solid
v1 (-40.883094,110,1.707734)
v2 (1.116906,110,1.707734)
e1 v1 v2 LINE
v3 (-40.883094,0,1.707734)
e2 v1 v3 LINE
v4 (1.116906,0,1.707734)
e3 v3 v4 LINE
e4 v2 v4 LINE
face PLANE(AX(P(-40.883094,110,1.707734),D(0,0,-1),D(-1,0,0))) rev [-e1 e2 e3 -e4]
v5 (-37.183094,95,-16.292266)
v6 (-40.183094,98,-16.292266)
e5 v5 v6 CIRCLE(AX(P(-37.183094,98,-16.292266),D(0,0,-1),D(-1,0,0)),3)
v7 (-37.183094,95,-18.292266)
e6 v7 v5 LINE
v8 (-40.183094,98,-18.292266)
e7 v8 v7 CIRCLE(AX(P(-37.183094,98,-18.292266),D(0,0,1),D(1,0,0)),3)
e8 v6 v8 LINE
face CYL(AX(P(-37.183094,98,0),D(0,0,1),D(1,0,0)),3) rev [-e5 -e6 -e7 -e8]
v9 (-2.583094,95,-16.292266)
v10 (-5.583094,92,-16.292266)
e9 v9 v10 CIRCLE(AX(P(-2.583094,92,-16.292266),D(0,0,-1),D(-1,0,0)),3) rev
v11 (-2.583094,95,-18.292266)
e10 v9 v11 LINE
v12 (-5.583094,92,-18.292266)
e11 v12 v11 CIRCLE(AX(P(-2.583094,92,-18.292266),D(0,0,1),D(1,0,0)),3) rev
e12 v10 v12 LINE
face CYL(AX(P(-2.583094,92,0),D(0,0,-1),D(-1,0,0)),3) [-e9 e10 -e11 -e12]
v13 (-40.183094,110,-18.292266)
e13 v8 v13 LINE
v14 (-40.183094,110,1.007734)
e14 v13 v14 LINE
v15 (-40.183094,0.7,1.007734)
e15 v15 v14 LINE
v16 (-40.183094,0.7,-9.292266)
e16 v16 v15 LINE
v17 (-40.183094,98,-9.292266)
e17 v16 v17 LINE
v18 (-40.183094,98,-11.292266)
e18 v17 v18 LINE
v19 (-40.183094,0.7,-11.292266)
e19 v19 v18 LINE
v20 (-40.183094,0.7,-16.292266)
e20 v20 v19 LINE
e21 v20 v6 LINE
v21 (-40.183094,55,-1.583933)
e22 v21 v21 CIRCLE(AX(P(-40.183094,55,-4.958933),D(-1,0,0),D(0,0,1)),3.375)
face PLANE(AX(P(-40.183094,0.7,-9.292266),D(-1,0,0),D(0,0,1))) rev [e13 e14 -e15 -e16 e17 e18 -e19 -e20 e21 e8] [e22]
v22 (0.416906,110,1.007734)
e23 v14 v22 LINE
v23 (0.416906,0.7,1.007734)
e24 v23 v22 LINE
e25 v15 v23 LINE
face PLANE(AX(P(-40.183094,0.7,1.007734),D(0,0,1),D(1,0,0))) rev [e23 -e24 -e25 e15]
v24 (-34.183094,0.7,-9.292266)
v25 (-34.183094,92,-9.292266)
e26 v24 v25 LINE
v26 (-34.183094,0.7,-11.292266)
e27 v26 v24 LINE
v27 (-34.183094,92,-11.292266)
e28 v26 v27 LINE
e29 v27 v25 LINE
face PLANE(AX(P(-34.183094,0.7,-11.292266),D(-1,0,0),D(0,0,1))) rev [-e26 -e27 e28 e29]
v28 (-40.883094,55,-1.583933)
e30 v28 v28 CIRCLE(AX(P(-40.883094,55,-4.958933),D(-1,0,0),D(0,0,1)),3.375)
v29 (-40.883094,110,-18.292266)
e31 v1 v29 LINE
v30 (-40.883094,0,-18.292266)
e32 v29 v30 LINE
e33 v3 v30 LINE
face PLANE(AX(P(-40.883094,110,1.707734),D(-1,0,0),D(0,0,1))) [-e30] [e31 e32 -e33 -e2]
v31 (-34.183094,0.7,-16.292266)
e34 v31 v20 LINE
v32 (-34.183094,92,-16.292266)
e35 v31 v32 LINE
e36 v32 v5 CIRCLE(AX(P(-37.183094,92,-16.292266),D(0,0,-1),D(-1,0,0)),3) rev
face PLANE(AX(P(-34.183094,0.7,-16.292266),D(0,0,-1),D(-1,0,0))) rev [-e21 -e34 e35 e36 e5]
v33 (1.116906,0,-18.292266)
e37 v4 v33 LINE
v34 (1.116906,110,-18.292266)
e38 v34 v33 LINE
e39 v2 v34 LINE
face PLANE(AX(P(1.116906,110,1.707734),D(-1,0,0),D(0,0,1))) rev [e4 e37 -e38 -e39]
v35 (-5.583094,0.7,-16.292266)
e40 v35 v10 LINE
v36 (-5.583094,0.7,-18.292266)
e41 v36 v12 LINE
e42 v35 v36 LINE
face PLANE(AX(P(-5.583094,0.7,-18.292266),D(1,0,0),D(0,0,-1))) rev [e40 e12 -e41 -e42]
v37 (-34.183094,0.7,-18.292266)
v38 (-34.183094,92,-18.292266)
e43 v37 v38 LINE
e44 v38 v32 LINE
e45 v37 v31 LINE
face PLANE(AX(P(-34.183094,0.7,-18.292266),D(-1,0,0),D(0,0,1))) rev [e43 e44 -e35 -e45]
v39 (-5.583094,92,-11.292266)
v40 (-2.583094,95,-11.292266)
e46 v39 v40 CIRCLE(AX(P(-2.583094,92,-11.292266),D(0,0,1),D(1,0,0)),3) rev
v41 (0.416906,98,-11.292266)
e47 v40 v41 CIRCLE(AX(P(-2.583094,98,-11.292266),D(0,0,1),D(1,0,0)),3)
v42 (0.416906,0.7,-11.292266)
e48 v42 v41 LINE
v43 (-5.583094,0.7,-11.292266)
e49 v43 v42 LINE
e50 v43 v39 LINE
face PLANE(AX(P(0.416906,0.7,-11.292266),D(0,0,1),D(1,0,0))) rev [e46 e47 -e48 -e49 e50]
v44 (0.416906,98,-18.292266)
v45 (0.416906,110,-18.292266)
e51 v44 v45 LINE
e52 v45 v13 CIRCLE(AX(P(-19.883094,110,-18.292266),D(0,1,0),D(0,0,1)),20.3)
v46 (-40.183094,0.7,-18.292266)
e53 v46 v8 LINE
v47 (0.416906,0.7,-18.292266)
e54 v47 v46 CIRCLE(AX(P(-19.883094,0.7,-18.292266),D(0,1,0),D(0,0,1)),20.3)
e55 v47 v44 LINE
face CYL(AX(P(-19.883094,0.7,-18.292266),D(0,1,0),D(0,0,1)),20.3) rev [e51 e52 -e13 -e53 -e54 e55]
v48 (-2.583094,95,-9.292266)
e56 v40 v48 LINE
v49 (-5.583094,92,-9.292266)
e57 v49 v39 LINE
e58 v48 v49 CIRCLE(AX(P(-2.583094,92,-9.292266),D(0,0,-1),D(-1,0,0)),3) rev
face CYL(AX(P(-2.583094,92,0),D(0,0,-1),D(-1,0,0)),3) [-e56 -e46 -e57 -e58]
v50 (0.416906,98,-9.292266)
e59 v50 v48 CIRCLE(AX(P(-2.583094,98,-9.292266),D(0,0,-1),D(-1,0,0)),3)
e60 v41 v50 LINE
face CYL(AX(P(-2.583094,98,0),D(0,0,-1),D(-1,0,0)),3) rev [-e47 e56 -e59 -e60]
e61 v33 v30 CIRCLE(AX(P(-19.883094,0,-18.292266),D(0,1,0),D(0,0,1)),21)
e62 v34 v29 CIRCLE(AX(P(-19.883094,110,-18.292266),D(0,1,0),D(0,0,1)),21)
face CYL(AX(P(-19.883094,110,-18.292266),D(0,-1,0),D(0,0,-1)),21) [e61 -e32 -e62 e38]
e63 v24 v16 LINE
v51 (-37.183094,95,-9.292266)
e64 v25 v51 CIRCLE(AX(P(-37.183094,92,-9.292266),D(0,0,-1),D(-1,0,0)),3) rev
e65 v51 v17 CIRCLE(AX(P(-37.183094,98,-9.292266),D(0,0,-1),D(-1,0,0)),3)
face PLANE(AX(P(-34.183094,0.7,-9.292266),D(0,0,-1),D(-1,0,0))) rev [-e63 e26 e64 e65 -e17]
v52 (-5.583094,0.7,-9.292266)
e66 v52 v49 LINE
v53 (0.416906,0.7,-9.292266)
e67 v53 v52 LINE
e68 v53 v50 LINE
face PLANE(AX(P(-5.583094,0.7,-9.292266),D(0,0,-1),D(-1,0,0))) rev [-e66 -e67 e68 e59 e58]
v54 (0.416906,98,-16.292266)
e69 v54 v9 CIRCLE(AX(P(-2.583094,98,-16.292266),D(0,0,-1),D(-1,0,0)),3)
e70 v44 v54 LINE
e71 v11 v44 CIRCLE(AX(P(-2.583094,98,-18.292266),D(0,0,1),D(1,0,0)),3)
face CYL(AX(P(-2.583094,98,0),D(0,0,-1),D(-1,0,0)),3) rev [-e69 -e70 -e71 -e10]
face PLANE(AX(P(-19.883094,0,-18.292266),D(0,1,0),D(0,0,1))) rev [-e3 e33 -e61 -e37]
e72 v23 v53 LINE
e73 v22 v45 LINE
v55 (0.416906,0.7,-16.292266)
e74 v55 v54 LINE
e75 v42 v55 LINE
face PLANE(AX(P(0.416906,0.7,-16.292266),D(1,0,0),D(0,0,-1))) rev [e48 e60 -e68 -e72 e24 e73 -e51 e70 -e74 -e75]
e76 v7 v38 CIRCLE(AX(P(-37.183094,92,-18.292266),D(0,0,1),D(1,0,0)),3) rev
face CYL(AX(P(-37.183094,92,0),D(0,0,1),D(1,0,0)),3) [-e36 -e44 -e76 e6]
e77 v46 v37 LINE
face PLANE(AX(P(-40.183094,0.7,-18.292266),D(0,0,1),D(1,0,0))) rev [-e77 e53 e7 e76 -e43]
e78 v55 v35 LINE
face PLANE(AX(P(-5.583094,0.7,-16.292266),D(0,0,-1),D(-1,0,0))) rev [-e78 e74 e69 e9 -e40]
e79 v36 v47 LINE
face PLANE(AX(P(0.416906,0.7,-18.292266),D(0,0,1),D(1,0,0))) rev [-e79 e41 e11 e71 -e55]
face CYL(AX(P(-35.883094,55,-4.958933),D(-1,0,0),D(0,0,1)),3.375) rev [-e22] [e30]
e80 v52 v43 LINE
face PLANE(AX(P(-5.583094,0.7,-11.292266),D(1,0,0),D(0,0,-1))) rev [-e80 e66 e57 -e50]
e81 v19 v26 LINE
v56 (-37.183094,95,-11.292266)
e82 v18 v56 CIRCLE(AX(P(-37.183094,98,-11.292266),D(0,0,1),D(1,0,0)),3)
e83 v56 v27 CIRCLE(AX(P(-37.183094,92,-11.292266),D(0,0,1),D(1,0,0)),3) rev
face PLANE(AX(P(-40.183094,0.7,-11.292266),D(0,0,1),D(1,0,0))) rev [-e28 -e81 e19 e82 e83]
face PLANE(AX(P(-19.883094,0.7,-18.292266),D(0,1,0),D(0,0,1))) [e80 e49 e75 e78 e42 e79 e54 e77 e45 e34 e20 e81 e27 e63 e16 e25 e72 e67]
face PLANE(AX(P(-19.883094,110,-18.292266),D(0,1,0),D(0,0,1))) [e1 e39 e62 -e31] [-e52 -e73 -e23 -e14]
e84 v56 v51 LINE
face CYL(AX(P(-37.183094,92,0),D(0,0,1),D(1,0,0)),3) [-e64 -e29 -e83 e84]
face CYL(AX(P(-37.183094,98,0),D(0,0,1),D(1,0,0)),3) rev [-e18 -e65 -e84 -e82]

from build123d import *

# Parameters (mm, degrees)
BOSS_EXTRUDE1_DEPTH = 110
CUT_EXTRUDE1_DEPTH  = 109.3
SKETCH3_R           = 3.375
CUT_EXTRUDE2_DEPTH  = 5
SKETCH4_W           = 40.6
SKETCH4_H           = 19.3
CUT_EXTRUDE3_DEPTH  = 15
FILLET1_R           = 3


with BuildPart() as part:
    # Sketch1 → Boss-Extrude1 (new body)
    with BuildSketch(Plane(origin=(0, 0, 0), x_dir=(1, 0, 0), z_dir=(0, 1, 0))):
        with BuildLine():
            Line((-40.883093525, -1.707733813), (1.116906475, -1.707733813))
            Line((1.116906475, -1.707733813), (1.116906475, 18.292266187))
            ThreePointArc((1.116906475, 18.292266187), (-19.883093525, 39.292266187), (-40.883093525, 18.292266187))
            Line((-40.883093525, 18.292266187), (-40.883093525, -1.707733813))
        make_face()
    extrude(amount=BOSS_EXTRUDE1_DEPTH)

    # Sketch2 → Cut-Extrude1 (cut)
    with BuildSketch(Plane(origin=(0, 110, 0), x_dir=(1, 0, 0), z_dir=(0, 1, 0))):
        with BuildLine():
            Line((-40.183093525, 16.292266187), (-40.183093525, 11.292266187))
            Line((-40.183093525, 11.292266187), (-34.183093525, 11.292266187))
            Line((-34.183093525, 11.292266187), (-34.183093525, 9.292266187))
            Line((-34.183093525, 9.292266187), (-40.183093525, 9.292266187))
            Line((-40.183093525, 9.292266187), (-40.183093525, -1.007733813))
            Line((-40.183093525, -1.007733813), (0.416906475, -1.007733813))
            Line((0.416906475, -1.007733813), (0.416906475, 9.292266187))
            Line((0.416906475, 9.292266187), (-5.583093525, 9.292266187))
            Line((-5.583093525, 9.292266187), (-5.583093525, 11.292266187))
            Line((-5.583093525, 11.292266187), (0.416906475, 11.292266187))
            Line((0.416906475, 11.292266187), (0.416906475, 16.292266187))
            Line((0.416906475, 16.292266187), (-5.583093525, 16.292266187))
            Line((-5.583093525, 16.292266187), (-5.583093525, 18.292266187))
            Line((-5.583093525, 18.292266187), (0.416906475, 18.292266187))
            ThreePointArc((0.416906475, 18.292266187), (-19.883093525, 38.592266187), (-40.183093525, 18.292266187))
            Line((-40.183093525, 18.292266187), (-34.183093525, 18.292266187))
            Line((-34.183093525, 18.292266187), (-34.183093525, 16.292266187))
            Line((-34.183093525, 16.292266187), (-40.183093525, 16.292266187))
        make_face()
    extrude(amount=-CUT_EXTRUDE1_DEPTH, mode=Mode.SUBTRACT)

    # Sketch3 → Cut-Extrude2 (cut)
    with BuildSketch(Plane.ZY.offset(40.883093525)):
        with Locations((-4.958932854, 55)):
            Circle(SKETCH3_R)
    extrude(amount=-CUT_EXTRUDE2_DEPTH, mode=Mode.SUBTRACT)

    # Sketch4 → Cut-Extrude3 (cut)
    with BuildSketch(Plane(origin=(0, 110, 0), x_dir=(1, 0, 0), z_dir=(0, 1, 0))):
        with Locations((-19.883093525, 8.642266187)):
            Rectangle(SKETCH4_W, SKETCH4_H)
    extrude(amount=-CUT_EXTRUDE3_DEPTH, mode=Mode.SUBTRACT)

    # Fillet1
    fillet1_edges = [part.edges().sort_by_distance(p)[0] for p in [
        (-40.183093525, 95, -17.292266187),
    ]]
    fillet(fillet1_edges, radius=FILLET1_R)
    fillet1_2_edges = [part.edges().sort_by_distance(p)[0] for p in [
        (-40.183093525, 95, -10.292266187),
    ]]
    fillet(fillet1_2_edges, radius=FILLET1_R)
    fillet1_3_edges = [part.edges().sort_by_distance(p)[0] for p in [
        (0.416906475, 95, -10.292266187),
    ]]
    fillet(fillet1_3_edges, radius=FILLET1_R)
    fillet1_4_edges = [part.edges().sort_by_distance(p)[0] for p in [
        (0.416906475, 95, -17.292266187),
    ]]
    fillet(fillet1_4_edges, radius=FILLET1_R)
    fillet1_5_edges = [part.edges().sort_by_distance(p)[0] for p in [
        (-5.583093525, 95, -17.292266187),
    ]]
    fillet(fillet1_5_edges, radius=FILLET1_R - 0.0001)  # a hair under: the kernel refuses the full size
    fillet1_6_edges = [part.edges().sort_by_distance(p)[0] for p in [
        (-5.583093525, 95, -10.292266187),
    ]]
    fillet(fillet1_6_edges, radius=FILLET1_R - 0.0001)  # a hair under: the kernel refuses the full size
    fillet1_7_edges = [part.edges().sort_by_distance(p)[0] for p in [
        (-34.183093525, 95, -10.292266187),
    ]]
    fillet(fillet1_7_edges, radius=FILLET1_R - 0.0001)  # a hair under: the kernel refuses the full size
    fillet1_8_edges = [part.edges().sort_by_distance(p)[0] for p in [
        (-34.183093525, 95, -17.292266187),
    ]]
    fillet(fillet1_8_edges, radius=FILLET1_R - 0.0001)  # a hair under: the kernel refuses the full size


solid = part.part
